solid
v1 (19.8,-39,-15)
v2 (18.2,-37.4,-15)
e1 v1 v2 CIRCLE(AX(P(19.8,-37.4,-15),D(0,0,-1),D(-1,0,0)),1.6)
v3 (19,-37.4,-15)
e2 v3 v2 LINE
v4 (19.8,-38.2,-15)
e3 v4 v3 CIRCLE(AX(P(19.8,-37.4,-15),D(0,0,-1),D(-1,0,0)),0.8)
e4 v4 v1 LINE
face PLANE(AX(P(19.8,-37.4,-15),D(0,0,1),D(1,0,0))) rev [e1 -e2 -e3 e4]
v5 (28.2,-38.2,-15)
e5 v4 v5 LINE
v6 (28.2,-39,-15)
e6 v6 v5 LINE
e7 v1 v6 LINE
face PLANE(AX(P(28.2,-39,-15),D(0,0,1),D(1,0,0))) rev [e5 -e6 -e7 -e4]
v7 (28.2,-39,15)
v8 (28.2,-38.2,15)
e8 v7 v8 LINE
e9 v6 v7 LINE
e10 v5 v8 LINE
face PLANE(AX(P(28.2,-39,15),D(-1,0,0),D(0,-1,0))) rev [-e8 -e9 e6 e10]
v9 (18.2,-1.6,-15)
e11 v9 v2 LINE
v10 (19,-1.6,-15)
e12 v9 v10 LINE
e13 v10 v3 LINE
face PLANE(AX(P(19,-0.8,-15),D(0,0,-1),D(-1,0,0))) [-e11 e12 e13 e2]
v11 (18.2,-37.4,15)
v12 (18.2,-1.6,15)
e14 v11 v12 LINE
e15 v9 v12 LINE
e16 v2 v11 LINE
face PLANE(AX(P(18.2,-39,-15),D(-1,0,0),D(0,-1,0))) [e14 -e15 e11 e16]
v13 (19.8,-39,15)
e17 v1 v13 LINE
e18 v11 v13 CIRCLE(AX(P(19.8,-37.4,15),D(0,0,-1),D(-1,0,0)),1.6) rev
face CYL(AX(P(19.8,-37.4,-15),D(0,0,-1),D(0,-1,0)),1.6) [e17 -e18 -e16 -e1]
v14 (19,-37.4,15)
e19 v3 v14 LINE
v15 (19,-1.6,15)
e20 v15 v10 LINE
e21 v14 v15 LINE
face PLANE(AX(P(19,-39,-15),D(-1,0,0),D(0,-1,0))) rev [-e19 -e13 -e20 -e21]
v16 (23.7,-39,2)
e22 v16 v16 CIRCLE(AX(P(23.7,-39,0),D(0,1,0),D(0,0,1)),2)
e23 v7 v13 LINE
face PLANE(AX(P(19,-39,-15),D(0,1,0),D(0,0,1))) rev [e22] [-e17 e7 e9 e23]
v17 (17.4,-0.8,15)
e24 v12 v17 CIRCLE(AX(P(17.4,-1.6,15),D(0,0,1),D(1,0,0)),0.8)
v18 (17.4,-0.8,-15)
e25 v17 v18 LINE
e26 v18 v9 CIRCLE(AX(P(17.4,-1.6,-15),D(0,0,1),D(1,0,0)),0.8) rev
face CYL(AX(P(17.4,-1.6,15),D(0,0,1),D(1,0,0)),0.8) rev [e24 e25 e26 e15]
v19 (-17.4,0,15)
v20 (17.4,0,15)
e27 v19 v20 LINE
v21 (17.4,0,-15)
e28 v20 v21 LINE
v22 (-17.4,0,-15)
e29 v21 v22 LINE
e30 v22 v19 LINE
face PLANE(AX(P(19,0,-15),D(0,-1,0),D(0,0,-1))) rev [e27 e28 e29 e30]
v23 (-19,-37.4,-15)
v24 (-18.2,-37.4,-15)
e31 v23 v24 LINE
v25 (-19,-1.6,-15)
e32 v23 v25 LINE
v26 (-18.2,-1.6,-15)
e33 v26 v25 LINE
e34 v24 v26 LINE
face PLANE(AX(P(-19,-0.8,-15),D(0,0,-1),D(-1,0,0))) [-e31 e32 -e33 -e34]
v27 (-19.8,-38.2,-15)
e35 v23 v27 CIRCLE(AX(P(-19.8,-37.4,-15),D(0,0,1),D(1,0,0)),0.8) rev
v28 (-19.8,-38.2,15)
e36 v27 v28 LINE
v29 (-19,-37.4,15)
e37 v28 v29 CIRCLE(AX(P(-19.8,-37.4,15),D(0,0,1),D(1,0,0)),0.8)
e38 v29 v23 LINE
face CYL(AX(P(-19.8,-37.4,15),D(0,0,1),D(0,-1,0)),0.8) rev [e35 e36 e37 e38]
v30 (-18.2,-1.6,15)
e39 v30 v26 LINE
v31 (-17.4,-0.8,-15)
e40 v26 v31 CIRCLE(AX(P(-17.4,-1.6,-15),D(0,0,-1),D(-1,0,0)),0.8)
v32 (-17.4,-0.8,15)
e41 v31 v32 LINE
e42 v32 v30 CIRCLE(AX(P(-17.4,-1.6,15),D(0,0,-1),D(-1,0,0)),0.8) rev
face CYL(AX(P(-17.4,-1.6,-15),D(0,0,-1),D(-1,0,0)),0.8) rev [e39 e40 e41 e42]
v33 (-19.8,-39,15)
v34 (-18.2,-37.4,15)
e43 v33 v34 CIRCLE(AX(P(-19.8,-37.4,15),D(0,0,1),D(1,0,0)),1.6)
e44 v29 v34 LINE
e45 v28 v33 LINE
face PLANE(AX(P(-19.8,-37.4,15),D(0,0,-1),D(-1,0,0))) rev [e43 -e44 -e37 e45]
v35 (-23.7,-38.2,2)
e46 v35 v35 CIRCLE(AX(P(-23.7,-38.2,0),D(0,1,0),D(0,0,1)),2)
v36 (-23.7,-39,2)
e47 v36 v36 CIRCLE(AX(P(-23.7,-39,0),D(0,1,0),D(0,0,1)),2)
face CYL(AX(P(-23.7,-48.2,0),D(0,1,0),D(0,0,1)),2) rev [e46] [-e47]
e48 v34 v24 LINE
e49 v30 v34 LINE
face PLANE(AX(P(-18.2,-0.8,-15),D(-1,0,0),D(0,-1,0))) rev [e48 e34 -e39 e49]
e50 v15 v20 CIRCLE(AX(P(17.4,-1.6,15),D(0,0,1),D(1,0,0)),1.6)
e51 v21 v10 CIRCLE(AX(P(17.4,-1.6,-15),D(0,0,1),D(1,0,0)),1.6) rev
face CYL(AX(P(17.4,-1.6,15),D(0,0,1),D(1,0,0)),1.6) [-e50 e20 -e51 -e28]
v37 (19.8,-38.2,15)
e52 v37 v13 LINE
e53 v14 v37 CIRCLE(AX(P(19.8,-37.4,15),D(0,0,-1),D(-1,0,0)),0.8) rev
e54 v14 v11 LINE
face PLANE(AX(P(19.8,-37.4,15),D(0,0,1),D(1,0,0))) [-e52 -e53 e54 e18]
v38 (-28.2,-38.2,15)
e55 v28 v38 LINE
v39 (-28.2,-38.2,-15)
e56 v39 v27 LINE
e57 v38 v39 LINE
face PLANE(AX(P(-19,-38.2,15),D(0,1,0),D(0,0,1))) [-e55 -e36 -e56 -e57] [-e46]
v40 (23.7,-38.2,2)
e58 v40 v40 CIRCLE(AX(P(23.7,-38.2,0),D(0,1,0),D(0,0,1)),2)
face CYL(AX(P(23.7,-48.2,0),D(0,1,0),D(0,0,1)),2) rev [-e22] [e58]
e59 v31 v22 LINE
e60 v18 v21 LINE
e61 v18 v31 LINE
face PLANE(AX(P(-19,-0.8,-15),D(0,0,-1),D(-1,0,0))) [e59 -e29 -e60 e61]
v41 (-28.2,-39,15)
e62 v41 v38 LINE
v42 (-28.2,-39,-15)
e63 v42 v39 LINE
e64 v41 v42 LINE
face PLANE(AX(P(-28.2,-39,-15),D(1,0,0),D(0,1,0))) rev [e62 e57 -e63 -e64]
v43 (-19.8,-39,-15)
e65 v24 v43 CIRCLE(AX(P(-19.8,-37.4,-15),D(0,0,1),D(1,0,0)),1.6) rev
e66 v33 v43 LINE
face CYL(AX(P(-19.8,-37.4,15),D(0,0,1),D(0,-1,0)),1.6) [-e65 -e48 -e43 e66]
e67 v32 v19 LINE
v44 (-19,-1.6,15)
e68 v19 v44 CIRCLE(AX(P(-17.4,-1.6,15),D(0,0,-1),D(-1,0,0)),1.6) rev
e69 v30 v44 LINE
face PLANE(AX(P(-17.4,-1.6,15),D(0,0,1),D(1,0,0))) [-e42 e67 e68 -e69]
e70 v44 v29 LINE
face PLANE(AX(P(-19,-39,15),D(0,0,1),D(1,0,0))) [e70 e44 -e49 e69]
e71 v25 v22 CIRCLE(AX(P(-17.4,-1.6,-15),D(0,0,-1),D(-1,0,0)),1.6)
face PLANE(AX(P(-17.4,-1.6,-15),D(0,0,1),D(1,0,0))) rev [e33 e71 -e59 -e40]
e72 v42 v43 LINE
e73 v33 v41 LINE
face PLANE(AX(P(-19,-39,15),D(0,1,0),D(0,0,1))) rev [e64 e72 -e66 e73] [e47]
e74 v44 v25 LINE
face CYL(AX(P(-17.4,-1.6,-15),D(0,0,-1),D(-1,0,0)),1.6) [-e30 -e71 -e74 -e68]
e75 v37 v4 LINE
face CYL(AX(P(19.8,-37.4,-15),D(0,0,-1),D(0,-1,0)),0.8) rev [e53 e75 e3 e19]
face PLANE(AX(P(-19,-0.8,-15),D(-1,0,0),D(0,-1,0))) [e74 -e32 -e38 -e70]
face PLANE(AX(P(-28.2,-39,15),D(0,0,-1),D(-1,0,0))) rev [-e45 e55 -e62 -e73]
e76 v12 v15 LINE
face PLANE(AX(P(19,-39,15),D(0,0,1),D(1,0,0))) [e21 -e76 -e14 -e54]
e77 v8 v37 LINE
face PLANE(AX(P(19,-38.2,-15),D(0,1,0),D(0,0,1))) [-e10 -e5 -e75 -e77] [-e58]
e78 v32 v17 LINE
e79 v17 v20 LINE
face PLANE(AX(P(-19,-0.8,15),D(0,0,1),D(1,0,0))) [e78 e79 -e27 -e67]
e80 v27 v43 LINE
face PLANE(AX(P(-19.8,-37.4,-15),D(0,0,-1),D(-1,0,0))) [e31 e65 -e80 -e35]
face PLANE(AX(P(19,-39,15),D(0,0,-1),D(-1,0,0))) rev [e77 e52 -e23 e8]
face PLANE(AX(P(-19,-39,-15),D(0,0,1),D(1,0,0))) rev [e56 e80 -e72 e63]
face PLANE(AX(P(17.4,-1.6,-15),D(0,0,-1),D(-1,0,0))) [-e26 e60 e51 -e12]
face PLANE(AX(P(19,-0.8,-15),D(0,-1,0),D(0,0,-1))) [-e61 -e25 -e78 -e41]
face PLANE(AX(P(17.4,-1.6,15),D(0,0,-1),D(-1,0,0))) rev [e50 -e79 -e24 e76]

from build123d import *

# Parameters (mm, degrees)
SKETCH1_W                      = 38
SKETCH1_H                      = 30
BASE_FLANGE1_DEPTH             = 0.8
EDGE_FLANGE1_STRIP_W           = 4.8
EDGE_FLANGE1_STRIP_H           = 0.8
EDGE_FLANGE1_STRIP_CUT_DEPTH   = 30
EDGE_FLANGE1_STRIP_2_W         = 4.8
EDGE_FLANGE1_STRIP_2_H         = 0.8
EDGE_FLANGE1_STRIP_CUT_2_DEPTH = 30
EDGE_FLANGE1_DEPTH             = 30
EDGE_FLANGE1_BEND_DEPTH        = 30
EDGE_FLANGE2_STRIP_W           = 4.8
EDGE_FLANGE2_STRIP_H           = 0.8
EDGE_FLANGE2_STRIP_CUT_DEPTH   = 30
EDGE_FLANGE2_STRIP_2_W         = 4.8
EDGE_FLANGE2_STRIP_2_H         = 0.8
EDGE_FLANGE2_STRIP_CUT_2_DEPTH = 30
EDGE_FLANGE2_DEPTH             = 30
EDGE_FLANGE2_BEND_DEPTH        = 30
SKETCH15_R                     = 2
CUT_EXTRUDE1_DEPTH             = 10


# Sheet-metal steps are written as plain solids
with BuildPart() as part:
    # Sketch1 → Base-Flange1 (new body)
    with BuildSketch(Plane(origin=(0, 0, 0), x_dir=(1, 0, 0), z_dir=(0, 1, 0))):
        Rectangle(SKETCH1_W, SKETCH1_H)
    extrude(amount=-BASE_FLANGE1_DEPTH)

    # Edge-Flange1 strip (across the edge) → Edge-Flange1 strip cut (cut)
    with BuildSketch(Plane(origin=(-19, -0.8, 15), x_dir=(1, 0, 0), z_dir=(0, 0, -1))):
        with Locations((-0.8, -0.4)):
            Rectangle(EDGE_FLANGE1_STRIP_W, EDGE_FLANGE1_STRIP_H)
    extrude(amount=EDGE_FLANGE1_STRIP_CUT_DEPTH, mode=Mode.SUBTRACT)

    # Edge-Flange1 strip 2 (across the edge) → Edge-Flange1 strip cut 2 (cut)
    with BuildSketch(Plane(origin=(19, -0.8, -15), x_dir=(-1, 0, 0), z_dir=(0, 0, 1))):
        with Locations((-0.8, -0.4)):
            Rectangle(EDGE_FLANGE1_STRIP_2_W, EDGE_FLANGE1_STRIP_2_H)
    extrude(amount=EDGE_FLANGE1_STRIP_CUT_2_DEPTH, mode=Mode.SUBTRACT)

    # Edge-Flange1 section (across the edge) → Edge-Flange1 (add)
    with BuildSketch(Plane(origin=(-19, -0.8, 15), x_dir=(1, 0, 0), z_dir=(0, 0, -1))):
        with BuildLine():
            Line((0, 0.8), (0, 38.2))
            Line((0, 38.2), (0.8, 38.2))
            Line((0.8, 38.2), (0.8, 0.8))
            ThreePointArc((0.8, 0.8), (1.034314575, 0.234314575), (1.6, 0))
            Line((1.6, 0), (1.6, -0.8))
            ThreePointArc((1.6, -0.8), (0.46862915, -0.33137085), (0, 0.8))
        make_face()
    extrude(amount=EDGE_FLANGE1_DEPTH)

    # Edge-Flange1 section 2 (across the edge) → Edge-Flange1 bend (add)
    with BuildSketch(Plane(origin=(19, -0.8, -15), x_dir=(-1, 0, 0), z_dir=(0, 0, 1))):
        with BuildLine():
            Line((0, 0.8), (0, 38.2))
            Line((0, 38.2), (0.8, 38.2))
            Line((0.8, 38.2), (0.8, 0.8))
            ThreePointArc((0.8, 0.8), (1.034314575, 0.234314575), (1.6, 0))
            Line((1.6, 0), (1.6, -0.8))
            ThreePointArc((1.6, -0.8), (0.46862915, -0.33137085), (0, 0.8))
        make_face()
    extrude(amount=EDGE_FLANGE1_BEND_DEPTH)

    # Edge-Flange2 strip (across the edge) → Edge-Flange2 strip cut (cut)
    with BuildSketch(Plane(origin=(-19, -39, -15), x_dir=(0, 1, 0), z_dir=(0, 0, 1))):
        with Locations((-0.8, -0.4)):
            Rectangle(EDGE_FLANGE2_STRIP_W, EDGE_FLANGE2_STRIP_H)
    extrude(amount=EDGE_FLANGE2_STRIP_CUT_DEPTH, mode=Mode.SUBTRACT)

    # Edge-Flange2 strip 2 (across the edge) → Edge-Flange2 strip cut 2 (cut)
    with BuildSketch(Plane(origin=(19, -39, 15), x_dir=(0, 1, 0), z_dir=(0, 0, -1))):
        with Locations((-0.8, -0.4)):
            Rectangle(EDGE_FLANGE2_STRIP_2_W, EDGE_FLANGE2_STRIP_2_H)
    extrude(amount=EDGE_FLANGE2_STRIP_CUT_2_DEPTH, mode=Mode.SUBTRACT)

    # Edge-Flange2 section (across the edge) → Edge-Flange2 (add)
    with BuildSketch(Plane(origin=(-19, -39, -15), x_dir=(0, 1, 0), z_dir=(0, 0, 1))):
        with BuildLine():
            Line((0, 0.8), (0, 9.2))
            Line((0, 9.2), (0.8, 9.2))
            Line((0.8, 9.2), (0.8, 0.8))
            ThreePointArc((0.8, 0.8), (1.034314575, 0.234314575), (1.6, 0))
            Line((1.6, 0), (1.6, -0.8))
            ThreePointArc((1.6, -0.8), (0.46862915, -0.33137085), (0, 0.8))
        make_face()
    extrude(amount=EDGE_FLANGE2_DEPTH)

    # Edge-Flange2 section 2 (across the edge) → Edge-Flange2 bend (add)
    with BuildSketch(Plane(origin=(19, -39, 15), x_dir=(0, 1, 0), z_dir=(0, 0, -1))):
        with BuildLine():
            Line((0, 0.8), (0, 9.2))
            Line((0, 9.2), (0.8, 9.2))
            Line((0.8, 9.2), (0.8, 0.8))
            ThreePointArc((0.8, 0.8), (1.034314575, 0.234314575), (1.6, 0))
            Line((1.6, 0), (1.6, -0.8))
            ThreePointArc((1.6, -0.8), (0.46862915, -0.33137085), (0, 0.8))
        make_face()
    extrude(amount=EDGE_FLANGE2_BEND_DEPTH)

    # Sketch15 → Cut-Extrude1 (cut)
    with BuildSketch(Plane(origin=(0, -38.2, 0), x_dir=(1, 0, 0), z_dir=(0, 1, 0))):
        with Locations(Location((-23.7, 0, 0), (0, 0, 270))):
            Circle(SKETCH15_R)
        with Locations(Location((23.7, 0, 0), (0, 0, 270))):
            Circle(SKETCH15_R)
    extrude(amount=-CUT_EXTRUDE1_DEPTH, mode=Mode.SUBTRACT)


solid = part.part
